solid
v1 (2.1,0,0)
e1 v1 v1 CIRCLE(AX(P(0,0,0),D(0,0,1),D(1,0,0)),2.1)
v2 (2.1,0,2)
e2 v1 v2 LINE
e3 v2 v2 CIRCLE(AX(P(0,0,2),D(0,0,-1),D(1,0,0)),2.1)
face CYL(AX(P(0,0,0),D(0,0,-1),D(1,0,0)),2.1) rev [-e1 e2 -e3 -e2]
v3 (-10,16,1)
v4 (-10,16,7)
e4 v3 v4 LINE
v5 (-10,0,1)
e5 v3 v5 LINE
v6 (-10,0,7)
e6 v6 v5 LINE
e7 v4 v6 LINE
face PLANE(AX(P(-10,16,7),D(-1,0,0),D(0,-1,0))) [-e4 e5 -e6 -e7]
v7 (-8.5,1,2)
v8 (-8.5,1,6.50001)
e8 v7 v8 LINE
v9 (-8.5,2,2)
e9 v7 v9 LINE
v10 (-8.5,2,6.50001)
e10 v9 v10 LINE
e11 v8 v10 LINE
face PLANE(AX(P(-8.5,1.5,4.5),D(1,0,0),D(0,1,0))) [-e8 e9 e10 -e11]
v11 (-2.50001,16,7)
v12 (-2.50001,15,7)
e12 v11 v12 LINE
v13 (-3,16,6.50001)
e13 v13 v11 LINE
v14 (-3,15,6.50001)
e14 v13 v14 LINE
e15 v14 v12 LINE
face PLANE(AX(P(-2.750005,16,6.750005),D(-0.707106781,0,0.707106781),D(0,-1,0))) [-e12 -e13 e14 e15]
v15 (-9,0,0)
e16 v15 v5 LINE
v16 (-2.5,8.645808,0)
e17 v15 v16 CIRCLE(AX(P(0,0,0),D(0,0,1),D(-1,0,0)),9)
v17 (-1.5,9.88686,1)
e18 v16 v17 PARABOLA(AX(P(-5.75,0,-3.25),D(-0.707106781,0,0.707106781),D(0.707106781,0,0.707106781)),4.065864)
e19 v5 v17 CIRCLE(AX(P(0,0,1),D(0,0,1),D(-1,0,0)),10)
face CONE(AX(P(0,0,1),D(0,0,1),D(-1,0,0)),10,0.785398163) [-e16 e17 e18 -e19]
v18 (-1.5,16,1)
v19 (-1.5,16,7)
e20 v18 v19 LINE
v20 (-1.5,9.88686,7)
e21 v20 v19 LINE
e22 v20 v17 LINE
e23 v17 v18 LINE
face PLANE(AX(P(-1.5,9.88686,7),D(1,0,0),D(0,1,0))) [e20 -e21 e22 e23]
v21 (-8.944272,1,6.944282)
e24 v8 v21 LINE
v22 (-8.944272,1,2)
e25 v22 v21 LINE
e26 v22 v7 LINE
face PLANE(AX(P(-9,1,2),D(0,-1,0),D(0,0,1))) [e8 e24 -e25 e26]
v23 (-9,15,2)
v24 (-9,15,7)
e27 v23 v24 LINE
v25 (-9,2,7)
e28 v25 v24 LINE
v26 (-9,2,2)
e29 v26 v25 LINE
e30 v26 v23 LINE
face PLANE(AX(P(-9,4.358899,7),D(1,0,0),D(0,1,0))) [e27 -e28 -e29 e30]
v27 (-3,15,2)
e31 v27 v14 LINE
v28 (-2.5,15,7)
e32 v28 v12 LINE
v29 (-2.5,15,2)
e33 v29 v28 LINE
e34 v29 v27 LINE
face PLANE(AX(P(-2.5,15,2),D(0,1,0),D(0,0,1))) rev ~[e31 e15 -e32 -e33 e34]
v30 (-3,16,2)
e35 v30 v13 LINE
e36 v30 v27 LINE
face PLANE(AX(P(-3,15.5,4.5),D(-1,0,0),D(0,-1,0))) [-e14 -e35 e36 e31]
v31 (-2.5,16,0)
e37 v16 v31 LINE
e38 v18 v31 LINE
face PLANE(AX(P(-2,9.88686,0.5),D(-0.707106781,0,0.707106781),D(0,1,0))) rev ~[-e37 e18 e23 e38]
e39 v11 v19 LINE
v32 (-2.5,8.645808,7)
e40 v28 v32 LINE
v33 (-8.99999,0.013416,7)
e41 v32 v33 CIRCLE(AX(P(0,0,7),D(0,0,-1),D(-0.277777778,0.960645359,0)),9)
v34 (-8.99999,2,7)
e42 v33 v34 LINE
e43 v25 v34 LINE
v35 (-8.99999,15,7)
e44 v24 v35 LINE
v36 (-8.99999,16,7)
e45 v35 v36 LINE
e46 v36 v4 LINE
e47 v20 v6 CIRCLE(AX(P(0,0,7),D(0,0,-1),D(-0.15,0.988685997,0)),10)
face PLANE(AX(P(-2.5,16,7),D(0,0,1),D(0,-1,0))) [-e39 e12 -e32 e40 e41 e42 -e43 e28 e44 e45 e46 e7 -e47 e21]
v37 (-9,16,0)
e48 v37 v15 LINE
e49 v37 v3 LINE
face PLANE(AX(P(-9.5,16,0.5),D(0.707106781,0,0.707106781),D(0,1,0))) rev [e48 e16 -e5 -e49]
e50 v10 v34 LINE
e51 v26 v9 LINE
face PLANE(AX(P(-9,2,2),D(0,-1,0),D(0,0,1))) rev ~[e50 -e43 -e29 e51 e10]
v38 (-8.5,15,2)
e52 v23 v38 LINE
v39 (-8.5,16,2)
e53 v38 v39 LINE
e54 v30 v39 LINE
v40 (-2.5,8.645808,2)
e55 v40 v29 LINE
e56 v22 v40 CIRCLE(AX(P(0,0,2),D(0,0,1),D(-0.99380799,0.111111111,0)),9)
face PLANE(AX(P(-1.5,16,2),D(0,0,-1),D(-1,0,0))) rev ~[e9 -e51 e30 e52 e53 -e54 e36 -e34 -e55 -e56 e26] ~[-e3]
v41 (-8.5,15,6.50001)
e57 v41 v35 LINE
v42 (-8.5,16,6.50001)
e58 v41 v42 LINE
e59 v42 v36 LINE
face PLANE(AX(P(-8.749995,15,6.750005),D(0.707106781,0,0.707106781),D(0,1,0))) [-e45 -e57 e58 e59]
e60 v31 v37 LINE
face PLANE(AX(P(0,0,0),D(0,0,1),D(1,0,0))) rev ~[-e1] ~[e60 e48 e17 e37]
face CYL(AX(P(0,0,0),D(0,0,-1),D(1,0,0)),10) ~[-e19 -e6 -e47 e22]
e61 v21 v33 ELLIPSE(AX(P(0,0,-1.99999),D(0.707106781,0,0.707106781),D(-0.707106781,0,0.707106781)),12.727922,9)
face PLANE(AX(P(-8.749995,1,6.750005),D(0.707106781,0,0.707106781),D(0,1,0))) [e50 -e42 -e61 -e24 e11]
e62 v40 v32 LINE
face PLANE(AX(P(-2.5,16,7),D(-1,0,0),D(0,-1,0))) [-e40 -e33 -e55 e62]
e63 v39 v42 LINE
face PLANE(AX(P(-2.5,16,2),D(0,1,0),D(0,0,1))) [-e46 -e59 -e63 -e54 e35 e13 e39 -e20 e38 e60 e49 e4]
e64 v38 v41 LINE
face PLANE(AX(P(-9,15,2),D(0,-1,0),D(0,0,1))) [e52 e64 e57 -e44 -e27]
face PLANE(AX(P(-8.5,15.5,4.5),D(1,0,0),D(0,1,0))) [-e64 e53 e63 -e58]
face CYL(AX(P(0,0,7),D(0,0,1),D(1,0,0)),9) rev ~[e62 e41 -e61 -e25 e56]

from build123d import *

# Parameters (mm, degrees)
F0_R      = 10
F0_R_2    = 2.1
F1_DEPTH  = 7
F2_R      = 9
F3_DEPTH  = 5
F5_DEPTH  = 7
F6_W      = 8.5
F6_H      = 2
F7_DEPTH  = 12.8
F8_W      = 6.5
F8_H      = 5
F9_DEPTH  = 15
F10_W     = 1
F10_H     = 5
F11_DEPTH = 0.5
F12_W     = 1
F12_H     = 5
F13_DEPTH = 0.5
F14_SIZE  = 0.49999
F15_SIZE  = 1


# Not quite as in the source:
# - a fillet or chamfer is up to 0.001 mm smaller than in the source, because OpenCascade refuses the exact size


with BuildPart() as f1:
    # F0 (on Top) → F1 (new body)
    with BuildSketch(Plane.XY):
        Circle(F0_R)
        Circle(F0_R_2, mode=Mode.SUBTRACT)
    extrude(amount=F1_DEPTH)

    # F2 (on face) → F3 (cut)
    with BuildSketch(Plane.XY.offset(7)):
        Circle(F2_R)
    extrude(amount=-F3_DEPTH, mode=Mode.SUBTRACT)

    # F4 (on face) → F5 (join)
    with BuildSketch(Plane.XY.offset(7)):
        with BuildLine():
            Line((-10, 16), (-10, 0))
            ThreePointArc((-10, 0), (-9.7467943448, 2.2360679775), (-9, 4.3588989435))
            Line((-9, 4.3588989435), (-9, 16))
            Line((-9, 16), (-10, 16))
        make_face()
        with BuildLine():
            ThreePointArc((-2.5, 9.6824583655), (-2.0026095485, 9.7974259373), (-1.5, 9.8868599666))
            Line((-1.5, 9.8868599666), (-1.5, 16))
            Line((-1.5, 16), (-2.5, 16))
            Line((-2.5, 16), (-2.5, 9.6824583655))
        make_face()
    extrude(amount=-F5_DEPTH)

    # F6 (on face) → F7 (join)
    with BuildSketch(Plane(origin=(0, 16, 0), x_dir=(-1, 0, 0), z_dir=(0, 1, 0))):
        with Locations((5.75, 1)):
            Rectangle(F6_W, F6_H)
    extrude(amount=-F7_DEPTH)

    # F8 (on face) → F9 (cut)
    with BuildSketch(Plane(origin=(0, 16, 0), x_dir=(-1, 0, 0), z_dir=(0, 1, 0))):
        with Locations((5.75, 4.5)):
            Rectangle(F8_W, F8_H)
    extrude(amount=-F9_DEPTH, mode=Mode.SUBTRACT)

    # F10 (on face) → F11 (join)
    with BuildSketch(Plane.YZ.offset(-9)):
        with Locations((1.5, 4.5)):
            Rectangle(F10_W, F10_H)
        with Locations((15.5, 4.5)):
            Rectangle(F10_W, F10_H)
    extrude(amount=F11_DEPTH)

    # F12 (on face) → F13 (join)
    with BuildSketch(Plane(origin=(-2.5, 0, 0), x_dir=(0, -1, 0), z_dir=(-1, 0, 0))):
        with Locations((-15.5, 4.5)):
            Rectangle(F12_W, F12_H)
    extrude(amount=F13_DEPTH)

    # F14 (size 0.5 in the source; OpenCascade refuses exactly that, so slightly less here)
    f14_edges = [f1.edges().sort_by_distance(p)[0] for p in [
        (-8.5, 1.5, 7),
        (-8.5, 15.5, 7),
        (-3, 15.5, 7),
    ]]
    chamfer(f14_edges, length=F14_SIZE)

    # F15
    f15_edges = [f1.edges().sort_by_distance(p)[0] for p in [
        (7.582875, -6.519202, 0),
        (-1.5, 12.94343, 0),
        (-10, 8, 0),
    ]]
    chamfer(f15_edges, length=F15_SIZE)


solid = f1.part
